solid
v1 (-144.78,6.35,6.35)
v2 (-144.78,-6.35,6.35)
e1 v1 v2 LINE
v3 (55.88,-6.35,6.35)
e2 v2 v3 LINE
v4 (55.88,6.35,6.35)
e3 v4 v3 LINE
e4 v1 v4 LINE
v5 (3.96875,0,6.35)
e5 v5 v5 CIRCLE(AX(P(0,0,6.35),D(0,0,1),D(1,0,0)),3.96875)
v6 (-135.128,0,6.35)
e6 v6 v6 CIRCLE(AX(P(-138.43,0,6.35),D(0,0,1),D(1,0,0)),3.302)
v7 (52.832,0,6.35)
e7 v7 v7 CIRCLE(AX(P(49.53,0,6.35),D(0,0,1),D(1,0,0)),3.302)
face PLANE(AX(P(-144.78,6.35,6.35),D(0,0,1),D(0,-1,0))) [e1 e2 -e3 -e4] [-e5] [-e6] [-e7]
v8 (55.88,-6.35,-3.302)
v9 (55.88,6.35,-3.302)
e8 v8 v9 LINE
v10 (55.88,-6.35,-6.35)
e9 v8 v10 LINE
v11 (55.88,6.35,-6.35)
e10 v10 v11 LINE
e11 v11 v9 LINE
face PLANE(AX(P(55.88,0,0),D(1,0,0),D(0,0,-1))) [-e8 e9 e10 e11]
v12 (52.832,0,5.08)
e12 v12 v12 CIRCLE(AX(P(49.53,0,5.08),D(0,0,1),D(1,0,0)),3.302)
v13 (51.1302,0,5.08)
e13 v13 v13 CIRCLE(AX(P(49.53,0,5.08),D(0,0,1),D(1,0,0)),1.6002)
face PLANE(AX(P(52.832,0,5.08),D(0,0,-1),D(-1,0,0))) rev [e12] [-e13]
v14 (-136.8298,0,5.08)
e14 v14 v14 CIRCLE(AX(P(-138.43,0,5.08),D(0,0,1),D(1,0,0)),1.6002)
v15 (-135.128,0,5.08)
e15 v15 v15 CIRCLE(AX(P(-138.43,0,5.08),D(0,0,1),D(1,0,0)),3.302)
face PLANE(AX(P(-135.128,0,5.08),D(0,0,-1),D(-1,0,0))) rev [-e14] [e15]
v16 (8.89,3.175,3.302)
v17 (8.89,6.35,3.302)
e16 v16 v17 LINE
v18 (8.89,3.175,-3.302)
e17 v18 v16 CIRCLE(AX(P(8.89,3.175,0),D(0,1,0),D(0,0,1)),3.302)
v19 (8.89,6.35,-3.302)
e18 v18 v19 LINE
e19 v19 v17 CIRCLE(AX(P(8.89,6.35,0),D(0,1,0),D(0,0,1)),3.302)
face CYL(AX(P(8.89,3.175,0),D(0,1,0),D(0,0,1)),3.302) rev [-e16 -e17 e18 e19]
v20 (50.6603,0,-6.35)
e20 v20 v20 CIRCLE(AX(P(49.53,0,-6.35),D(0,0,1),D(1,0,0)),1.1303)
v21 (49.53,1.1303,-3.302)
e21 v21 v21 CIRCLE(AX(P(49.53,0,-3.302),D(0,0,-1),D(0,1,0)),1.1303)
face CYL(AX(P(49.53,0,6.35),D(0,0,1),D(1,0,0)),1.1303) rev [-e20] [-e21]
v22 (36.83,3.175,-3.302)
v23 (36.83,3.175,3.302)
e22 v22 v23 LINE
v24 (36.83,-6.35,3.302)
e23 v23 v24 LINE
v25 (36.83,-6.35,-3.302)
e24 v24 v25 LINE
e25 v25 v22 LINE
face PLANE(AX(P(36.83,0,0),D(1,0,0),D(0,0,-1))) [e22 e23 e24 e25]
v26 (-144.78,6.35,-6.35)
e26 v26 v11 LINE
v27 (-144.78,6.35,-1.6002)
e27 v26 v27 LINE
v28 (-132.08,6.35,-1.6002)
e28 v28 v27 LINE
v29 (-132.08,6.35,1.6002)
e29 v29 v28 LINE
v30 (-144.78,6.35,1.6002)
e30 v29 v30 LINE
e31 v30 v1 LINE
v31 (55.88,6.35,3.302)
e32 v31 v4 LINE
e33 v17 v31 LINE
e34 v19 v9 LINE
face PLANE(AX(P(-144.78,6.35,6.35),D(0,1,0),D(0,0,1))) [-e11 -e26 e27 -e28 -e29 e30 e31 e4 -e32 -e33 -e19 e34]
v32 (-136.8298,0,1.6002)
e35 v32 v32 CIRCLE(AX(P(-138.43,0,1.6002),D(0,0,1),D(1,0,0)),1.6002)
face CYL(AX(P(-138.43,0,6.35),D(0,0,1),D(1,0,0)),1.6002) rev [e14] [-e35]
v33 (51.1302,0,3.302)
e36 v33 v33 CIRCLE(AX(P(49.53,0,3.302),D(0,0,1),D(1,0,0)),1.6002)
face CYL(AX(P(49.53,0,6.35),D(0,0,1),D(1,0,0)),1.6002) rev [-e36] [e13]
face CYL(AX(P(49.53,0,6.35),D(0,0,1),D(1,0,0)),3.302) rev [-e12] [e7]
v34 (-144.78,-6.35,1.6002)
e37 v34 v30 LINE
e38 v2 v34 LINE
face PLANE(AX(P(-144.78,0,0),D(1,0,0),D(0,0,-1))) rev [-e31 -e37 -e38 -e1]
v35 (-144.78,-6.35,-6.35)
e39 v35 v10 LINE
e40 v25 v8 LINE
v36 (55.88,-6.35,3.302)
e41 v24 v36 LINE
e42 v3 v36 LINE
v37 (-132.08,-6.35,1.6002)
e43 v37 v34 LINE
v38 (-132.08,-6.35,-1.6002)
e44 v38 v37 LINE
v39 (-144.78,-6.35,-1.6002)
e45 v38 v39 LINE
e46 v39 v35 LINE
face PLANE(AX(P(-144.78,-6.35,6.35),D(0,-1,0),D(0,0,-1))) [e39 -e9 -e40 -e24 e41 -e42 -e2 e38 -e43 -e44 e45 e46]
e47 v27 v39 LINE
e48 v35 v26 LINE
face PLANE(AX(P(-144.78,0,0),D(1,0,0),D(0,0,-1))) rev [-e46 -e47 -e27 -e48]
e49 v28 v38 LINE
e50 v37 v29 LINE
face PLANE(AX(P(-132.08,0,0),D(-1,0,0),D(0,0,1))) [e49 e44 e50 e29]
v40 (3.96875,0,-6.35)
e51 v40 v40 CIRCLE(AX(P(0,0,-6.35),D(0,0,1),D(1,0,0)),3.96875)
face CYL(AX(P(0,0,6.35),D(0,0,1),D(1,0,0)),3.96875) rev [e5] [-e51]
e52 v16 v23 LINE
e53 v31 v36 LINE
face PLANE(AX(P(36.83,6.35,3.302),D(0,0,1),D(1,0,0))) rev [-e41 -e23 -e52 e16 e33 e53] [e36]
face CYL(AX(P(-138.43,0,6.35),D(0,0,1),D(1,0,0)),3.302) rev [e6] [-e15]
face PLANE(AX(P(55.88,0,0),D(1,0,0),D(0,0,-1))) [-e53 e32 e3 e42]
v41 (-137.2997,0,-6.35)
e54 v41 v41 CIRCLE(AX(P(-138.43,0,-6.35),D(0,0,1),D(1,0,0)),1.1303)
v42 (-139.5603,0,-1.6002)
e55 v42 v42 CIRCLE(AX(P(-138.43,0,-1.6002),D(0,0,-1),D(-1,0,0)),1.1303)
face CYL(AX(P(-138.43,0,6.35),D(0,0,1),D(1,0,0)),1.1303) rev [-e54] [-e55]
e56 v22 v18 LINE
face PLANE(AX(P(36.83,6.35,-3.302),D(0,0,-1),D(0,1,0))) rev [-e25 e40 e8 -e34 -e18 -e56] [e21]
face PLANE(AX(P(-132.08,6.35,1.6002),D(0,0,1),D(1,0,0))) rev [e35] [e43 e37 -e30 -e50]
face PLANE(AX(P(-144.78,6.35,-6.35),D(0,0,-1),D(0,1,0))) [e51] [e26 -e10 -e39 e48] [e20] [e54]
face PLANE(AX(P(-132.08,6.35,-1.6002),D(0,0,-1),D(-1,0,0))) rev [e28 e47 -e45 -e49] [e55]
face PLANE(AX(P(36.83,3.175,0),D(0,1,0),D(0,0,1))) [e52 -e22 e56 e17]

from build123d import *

# Parameters (mm, degrees)
BOSS_EXTRUDE1_DEPTH            = 55.88
BOSS_EXTRUDE1_DEPTH_BACK       = 144.78
SKETCH1_W                      = 12.7
SKETCH1_H                      = 12.7
F_5_16_0_3125_DIAMETER_HOLE2_D = 7.9375
SKETCH9_W                      = 6.604
SKETCH9_H                      = 12.7
CUT_EXTRUDE1_DEPTH             = 19.05
SKETCH19_W                     = 3.2004
SKETCH19_H                     = 12.7
CUT_EXTRUDE2_DEPTH             = 12.7
ADVANCEDHOLE2_START            = 5.08
ADVANCEDHOLE2_OUTLINE_R        = 3.302
ADVANCEDHOLE2_DEPTH            = 1.27
ADVANCEDHOLE2_START_2          = -6.35
ADVANCEDHOLE2_2_OUTLINE_R      = 1.1303
ADVANCEDHOLE2_2_DEPTH          = 11.43
ADVANCEDHOLE2_START_3          = 1.6002
ADVANCEDHOLE2_3_OUTLINE_R      = 1.6002
ADVANCEDHOLE2_3_OUTLINE_R_2    = 1.1303
ADVANCEDHOLE2_3_DEPTH          = 3.4798
CUT_EXTRUDE3_DEPTH             = 3.175


# Read off the part's stored shape, not the designer's step: AdvancedHole2
with BuildPart() as part:
    # Sketch1 → Boss-Extrude1 (new, two sides: drawn at the far end of the back side and taken through both)
    with BuildSketch(Plane(origin=(0, 0, 0), x_dir=(0, 0, -1), z_dir=(1, 0, 0)).offset(-BOSS_EXTRUDE1_DEPTH_BACK)):
        Rectangle(SKETCH1_W, SKETCH1_H)
    extrude(amount=BOSS_EXTRUDE1_DEPTH + BOSS_EXTRUDE1_DEPTH_BACK)

    # 5/16 (0.3125) Diameter Hole2 (through all)
    with Locations(Plane.XY.offset(6.35)):
        with Locations((0, 0)):
            Hole(F_5_16_0_3125_DIAMETER_HOLE2_D / 2)

    # Sketch9 → Cut-Extrude1 (cut)
    with BuildSketch(Plane(origin=(55.88, 0, 0), x_dir=(0, 0, -1), z_dir=(1, 0, 0))):
        Rectangle(SKETCH9_W, SKETCH9_H)
    extrude(amount=-CUT_EXTRUDE1_DEPTH, mode=Mode.SUBTRACT)

    # Sketch19 → Cut-Extrude2 (cut)
    with BuildSketch(Plane.ZY.offset(144.78)):
        Rectangle(SKETCH19_W, SKETCH19_H)
    extrude(amount=-CUT_EXTRUDE2_DEPTH, mode=Mode.SUBTRACT)

    # AdvancedHole2 outline → AdvancedHole2 (cut)
    with BuildSketch(Plane.XY.offset(ADVANCEDHOLE2_START)):
        with Locations((-138.43, 0)):
            Circle(ADVANCEDHOLE2_OUTLINE_R)
        with Locations((49.53, 0)):
            Circle(ADVANCEDHOLE2_OUTLINE_R)
    extrude(amount=ADVANCEDHOLE2_DEPTH, mode=Mode.SUBTRACT)

    # AdvancedHole2 2 outline → AdvancedHole2 2 (cut)
    with BuildSketch(Plane.XY.offset(ADVANCEDHOLE2_START_2)):
        with Locations((-138.43, 0)):
            Circle(ADVANCEDHOLE2_2_OUTLINE_R)
        with Locations((49.53, 0)):
            Circle(ADVANCEDHOLE2_2_OUTLINE_R)
    extrude(amount=ADVANCEDHOLE2_2_DEPTH, mode=Mode.SUBTRACT)

    # AdvancedHole2 3 outline → AdvancedHole2 3 (cut)
    # profile 1 of 2: a face of its own
    with BuildSketch(Plane.XY.offset(ADVANCEDHOLE2_START_3)):
        with Locations((-138.43, 0)):
            Circle(ADVANCEDHOLE2_3_OUTLINE_R)
        with Locations((-138.43, 0)):
            Circle(ADVANCEDHOLE2_3_OUTLINE_R_2, mode=Mode.SUBTRACT)
    # profile 2 of 2: a face of its own
    with BuildSketch(Plane.XY.offset(ADVANCEDHOLE2_START_3)):
        with Locations((49.53, 0)):
            Circle(ADVANCEDHOLE2_3_OUTLINE_R)
        with Locations((49.53, 0)):
            Circle(ADVANCEDHOLE2_3_OUTLINE_R_2, mode=Mode.SUBTRACT)
    extrude(amount=ADVANCEDHOLE2_3_DEPTH, mode=Mode.SUBTRACT)

    # Sketch20 → Cut-Extrude3 (cut)
    with BuildSketch(Plane(origin=(0, 6.35, 0), x_dir=(1, 0, 0), z_dir=(0, 1, 0))):
        with BuildLine():
            Line((36.83, -3.302), (8.89, -3.302))
            ThreePointArc((8.89, -3.302), (5.588, 0), (8.89, 3.302))
            Line((8.89, 3.302), (36.83, 3.302))
            ThreePointArc((36.83, 3.302), (40.132, 0), (36.83, -3.302))
        make_face()
    extrude(amount=-CUT_EXTRUDE3_DEPTH, mode=Mode.SUBTRACT)


solid = part.part
